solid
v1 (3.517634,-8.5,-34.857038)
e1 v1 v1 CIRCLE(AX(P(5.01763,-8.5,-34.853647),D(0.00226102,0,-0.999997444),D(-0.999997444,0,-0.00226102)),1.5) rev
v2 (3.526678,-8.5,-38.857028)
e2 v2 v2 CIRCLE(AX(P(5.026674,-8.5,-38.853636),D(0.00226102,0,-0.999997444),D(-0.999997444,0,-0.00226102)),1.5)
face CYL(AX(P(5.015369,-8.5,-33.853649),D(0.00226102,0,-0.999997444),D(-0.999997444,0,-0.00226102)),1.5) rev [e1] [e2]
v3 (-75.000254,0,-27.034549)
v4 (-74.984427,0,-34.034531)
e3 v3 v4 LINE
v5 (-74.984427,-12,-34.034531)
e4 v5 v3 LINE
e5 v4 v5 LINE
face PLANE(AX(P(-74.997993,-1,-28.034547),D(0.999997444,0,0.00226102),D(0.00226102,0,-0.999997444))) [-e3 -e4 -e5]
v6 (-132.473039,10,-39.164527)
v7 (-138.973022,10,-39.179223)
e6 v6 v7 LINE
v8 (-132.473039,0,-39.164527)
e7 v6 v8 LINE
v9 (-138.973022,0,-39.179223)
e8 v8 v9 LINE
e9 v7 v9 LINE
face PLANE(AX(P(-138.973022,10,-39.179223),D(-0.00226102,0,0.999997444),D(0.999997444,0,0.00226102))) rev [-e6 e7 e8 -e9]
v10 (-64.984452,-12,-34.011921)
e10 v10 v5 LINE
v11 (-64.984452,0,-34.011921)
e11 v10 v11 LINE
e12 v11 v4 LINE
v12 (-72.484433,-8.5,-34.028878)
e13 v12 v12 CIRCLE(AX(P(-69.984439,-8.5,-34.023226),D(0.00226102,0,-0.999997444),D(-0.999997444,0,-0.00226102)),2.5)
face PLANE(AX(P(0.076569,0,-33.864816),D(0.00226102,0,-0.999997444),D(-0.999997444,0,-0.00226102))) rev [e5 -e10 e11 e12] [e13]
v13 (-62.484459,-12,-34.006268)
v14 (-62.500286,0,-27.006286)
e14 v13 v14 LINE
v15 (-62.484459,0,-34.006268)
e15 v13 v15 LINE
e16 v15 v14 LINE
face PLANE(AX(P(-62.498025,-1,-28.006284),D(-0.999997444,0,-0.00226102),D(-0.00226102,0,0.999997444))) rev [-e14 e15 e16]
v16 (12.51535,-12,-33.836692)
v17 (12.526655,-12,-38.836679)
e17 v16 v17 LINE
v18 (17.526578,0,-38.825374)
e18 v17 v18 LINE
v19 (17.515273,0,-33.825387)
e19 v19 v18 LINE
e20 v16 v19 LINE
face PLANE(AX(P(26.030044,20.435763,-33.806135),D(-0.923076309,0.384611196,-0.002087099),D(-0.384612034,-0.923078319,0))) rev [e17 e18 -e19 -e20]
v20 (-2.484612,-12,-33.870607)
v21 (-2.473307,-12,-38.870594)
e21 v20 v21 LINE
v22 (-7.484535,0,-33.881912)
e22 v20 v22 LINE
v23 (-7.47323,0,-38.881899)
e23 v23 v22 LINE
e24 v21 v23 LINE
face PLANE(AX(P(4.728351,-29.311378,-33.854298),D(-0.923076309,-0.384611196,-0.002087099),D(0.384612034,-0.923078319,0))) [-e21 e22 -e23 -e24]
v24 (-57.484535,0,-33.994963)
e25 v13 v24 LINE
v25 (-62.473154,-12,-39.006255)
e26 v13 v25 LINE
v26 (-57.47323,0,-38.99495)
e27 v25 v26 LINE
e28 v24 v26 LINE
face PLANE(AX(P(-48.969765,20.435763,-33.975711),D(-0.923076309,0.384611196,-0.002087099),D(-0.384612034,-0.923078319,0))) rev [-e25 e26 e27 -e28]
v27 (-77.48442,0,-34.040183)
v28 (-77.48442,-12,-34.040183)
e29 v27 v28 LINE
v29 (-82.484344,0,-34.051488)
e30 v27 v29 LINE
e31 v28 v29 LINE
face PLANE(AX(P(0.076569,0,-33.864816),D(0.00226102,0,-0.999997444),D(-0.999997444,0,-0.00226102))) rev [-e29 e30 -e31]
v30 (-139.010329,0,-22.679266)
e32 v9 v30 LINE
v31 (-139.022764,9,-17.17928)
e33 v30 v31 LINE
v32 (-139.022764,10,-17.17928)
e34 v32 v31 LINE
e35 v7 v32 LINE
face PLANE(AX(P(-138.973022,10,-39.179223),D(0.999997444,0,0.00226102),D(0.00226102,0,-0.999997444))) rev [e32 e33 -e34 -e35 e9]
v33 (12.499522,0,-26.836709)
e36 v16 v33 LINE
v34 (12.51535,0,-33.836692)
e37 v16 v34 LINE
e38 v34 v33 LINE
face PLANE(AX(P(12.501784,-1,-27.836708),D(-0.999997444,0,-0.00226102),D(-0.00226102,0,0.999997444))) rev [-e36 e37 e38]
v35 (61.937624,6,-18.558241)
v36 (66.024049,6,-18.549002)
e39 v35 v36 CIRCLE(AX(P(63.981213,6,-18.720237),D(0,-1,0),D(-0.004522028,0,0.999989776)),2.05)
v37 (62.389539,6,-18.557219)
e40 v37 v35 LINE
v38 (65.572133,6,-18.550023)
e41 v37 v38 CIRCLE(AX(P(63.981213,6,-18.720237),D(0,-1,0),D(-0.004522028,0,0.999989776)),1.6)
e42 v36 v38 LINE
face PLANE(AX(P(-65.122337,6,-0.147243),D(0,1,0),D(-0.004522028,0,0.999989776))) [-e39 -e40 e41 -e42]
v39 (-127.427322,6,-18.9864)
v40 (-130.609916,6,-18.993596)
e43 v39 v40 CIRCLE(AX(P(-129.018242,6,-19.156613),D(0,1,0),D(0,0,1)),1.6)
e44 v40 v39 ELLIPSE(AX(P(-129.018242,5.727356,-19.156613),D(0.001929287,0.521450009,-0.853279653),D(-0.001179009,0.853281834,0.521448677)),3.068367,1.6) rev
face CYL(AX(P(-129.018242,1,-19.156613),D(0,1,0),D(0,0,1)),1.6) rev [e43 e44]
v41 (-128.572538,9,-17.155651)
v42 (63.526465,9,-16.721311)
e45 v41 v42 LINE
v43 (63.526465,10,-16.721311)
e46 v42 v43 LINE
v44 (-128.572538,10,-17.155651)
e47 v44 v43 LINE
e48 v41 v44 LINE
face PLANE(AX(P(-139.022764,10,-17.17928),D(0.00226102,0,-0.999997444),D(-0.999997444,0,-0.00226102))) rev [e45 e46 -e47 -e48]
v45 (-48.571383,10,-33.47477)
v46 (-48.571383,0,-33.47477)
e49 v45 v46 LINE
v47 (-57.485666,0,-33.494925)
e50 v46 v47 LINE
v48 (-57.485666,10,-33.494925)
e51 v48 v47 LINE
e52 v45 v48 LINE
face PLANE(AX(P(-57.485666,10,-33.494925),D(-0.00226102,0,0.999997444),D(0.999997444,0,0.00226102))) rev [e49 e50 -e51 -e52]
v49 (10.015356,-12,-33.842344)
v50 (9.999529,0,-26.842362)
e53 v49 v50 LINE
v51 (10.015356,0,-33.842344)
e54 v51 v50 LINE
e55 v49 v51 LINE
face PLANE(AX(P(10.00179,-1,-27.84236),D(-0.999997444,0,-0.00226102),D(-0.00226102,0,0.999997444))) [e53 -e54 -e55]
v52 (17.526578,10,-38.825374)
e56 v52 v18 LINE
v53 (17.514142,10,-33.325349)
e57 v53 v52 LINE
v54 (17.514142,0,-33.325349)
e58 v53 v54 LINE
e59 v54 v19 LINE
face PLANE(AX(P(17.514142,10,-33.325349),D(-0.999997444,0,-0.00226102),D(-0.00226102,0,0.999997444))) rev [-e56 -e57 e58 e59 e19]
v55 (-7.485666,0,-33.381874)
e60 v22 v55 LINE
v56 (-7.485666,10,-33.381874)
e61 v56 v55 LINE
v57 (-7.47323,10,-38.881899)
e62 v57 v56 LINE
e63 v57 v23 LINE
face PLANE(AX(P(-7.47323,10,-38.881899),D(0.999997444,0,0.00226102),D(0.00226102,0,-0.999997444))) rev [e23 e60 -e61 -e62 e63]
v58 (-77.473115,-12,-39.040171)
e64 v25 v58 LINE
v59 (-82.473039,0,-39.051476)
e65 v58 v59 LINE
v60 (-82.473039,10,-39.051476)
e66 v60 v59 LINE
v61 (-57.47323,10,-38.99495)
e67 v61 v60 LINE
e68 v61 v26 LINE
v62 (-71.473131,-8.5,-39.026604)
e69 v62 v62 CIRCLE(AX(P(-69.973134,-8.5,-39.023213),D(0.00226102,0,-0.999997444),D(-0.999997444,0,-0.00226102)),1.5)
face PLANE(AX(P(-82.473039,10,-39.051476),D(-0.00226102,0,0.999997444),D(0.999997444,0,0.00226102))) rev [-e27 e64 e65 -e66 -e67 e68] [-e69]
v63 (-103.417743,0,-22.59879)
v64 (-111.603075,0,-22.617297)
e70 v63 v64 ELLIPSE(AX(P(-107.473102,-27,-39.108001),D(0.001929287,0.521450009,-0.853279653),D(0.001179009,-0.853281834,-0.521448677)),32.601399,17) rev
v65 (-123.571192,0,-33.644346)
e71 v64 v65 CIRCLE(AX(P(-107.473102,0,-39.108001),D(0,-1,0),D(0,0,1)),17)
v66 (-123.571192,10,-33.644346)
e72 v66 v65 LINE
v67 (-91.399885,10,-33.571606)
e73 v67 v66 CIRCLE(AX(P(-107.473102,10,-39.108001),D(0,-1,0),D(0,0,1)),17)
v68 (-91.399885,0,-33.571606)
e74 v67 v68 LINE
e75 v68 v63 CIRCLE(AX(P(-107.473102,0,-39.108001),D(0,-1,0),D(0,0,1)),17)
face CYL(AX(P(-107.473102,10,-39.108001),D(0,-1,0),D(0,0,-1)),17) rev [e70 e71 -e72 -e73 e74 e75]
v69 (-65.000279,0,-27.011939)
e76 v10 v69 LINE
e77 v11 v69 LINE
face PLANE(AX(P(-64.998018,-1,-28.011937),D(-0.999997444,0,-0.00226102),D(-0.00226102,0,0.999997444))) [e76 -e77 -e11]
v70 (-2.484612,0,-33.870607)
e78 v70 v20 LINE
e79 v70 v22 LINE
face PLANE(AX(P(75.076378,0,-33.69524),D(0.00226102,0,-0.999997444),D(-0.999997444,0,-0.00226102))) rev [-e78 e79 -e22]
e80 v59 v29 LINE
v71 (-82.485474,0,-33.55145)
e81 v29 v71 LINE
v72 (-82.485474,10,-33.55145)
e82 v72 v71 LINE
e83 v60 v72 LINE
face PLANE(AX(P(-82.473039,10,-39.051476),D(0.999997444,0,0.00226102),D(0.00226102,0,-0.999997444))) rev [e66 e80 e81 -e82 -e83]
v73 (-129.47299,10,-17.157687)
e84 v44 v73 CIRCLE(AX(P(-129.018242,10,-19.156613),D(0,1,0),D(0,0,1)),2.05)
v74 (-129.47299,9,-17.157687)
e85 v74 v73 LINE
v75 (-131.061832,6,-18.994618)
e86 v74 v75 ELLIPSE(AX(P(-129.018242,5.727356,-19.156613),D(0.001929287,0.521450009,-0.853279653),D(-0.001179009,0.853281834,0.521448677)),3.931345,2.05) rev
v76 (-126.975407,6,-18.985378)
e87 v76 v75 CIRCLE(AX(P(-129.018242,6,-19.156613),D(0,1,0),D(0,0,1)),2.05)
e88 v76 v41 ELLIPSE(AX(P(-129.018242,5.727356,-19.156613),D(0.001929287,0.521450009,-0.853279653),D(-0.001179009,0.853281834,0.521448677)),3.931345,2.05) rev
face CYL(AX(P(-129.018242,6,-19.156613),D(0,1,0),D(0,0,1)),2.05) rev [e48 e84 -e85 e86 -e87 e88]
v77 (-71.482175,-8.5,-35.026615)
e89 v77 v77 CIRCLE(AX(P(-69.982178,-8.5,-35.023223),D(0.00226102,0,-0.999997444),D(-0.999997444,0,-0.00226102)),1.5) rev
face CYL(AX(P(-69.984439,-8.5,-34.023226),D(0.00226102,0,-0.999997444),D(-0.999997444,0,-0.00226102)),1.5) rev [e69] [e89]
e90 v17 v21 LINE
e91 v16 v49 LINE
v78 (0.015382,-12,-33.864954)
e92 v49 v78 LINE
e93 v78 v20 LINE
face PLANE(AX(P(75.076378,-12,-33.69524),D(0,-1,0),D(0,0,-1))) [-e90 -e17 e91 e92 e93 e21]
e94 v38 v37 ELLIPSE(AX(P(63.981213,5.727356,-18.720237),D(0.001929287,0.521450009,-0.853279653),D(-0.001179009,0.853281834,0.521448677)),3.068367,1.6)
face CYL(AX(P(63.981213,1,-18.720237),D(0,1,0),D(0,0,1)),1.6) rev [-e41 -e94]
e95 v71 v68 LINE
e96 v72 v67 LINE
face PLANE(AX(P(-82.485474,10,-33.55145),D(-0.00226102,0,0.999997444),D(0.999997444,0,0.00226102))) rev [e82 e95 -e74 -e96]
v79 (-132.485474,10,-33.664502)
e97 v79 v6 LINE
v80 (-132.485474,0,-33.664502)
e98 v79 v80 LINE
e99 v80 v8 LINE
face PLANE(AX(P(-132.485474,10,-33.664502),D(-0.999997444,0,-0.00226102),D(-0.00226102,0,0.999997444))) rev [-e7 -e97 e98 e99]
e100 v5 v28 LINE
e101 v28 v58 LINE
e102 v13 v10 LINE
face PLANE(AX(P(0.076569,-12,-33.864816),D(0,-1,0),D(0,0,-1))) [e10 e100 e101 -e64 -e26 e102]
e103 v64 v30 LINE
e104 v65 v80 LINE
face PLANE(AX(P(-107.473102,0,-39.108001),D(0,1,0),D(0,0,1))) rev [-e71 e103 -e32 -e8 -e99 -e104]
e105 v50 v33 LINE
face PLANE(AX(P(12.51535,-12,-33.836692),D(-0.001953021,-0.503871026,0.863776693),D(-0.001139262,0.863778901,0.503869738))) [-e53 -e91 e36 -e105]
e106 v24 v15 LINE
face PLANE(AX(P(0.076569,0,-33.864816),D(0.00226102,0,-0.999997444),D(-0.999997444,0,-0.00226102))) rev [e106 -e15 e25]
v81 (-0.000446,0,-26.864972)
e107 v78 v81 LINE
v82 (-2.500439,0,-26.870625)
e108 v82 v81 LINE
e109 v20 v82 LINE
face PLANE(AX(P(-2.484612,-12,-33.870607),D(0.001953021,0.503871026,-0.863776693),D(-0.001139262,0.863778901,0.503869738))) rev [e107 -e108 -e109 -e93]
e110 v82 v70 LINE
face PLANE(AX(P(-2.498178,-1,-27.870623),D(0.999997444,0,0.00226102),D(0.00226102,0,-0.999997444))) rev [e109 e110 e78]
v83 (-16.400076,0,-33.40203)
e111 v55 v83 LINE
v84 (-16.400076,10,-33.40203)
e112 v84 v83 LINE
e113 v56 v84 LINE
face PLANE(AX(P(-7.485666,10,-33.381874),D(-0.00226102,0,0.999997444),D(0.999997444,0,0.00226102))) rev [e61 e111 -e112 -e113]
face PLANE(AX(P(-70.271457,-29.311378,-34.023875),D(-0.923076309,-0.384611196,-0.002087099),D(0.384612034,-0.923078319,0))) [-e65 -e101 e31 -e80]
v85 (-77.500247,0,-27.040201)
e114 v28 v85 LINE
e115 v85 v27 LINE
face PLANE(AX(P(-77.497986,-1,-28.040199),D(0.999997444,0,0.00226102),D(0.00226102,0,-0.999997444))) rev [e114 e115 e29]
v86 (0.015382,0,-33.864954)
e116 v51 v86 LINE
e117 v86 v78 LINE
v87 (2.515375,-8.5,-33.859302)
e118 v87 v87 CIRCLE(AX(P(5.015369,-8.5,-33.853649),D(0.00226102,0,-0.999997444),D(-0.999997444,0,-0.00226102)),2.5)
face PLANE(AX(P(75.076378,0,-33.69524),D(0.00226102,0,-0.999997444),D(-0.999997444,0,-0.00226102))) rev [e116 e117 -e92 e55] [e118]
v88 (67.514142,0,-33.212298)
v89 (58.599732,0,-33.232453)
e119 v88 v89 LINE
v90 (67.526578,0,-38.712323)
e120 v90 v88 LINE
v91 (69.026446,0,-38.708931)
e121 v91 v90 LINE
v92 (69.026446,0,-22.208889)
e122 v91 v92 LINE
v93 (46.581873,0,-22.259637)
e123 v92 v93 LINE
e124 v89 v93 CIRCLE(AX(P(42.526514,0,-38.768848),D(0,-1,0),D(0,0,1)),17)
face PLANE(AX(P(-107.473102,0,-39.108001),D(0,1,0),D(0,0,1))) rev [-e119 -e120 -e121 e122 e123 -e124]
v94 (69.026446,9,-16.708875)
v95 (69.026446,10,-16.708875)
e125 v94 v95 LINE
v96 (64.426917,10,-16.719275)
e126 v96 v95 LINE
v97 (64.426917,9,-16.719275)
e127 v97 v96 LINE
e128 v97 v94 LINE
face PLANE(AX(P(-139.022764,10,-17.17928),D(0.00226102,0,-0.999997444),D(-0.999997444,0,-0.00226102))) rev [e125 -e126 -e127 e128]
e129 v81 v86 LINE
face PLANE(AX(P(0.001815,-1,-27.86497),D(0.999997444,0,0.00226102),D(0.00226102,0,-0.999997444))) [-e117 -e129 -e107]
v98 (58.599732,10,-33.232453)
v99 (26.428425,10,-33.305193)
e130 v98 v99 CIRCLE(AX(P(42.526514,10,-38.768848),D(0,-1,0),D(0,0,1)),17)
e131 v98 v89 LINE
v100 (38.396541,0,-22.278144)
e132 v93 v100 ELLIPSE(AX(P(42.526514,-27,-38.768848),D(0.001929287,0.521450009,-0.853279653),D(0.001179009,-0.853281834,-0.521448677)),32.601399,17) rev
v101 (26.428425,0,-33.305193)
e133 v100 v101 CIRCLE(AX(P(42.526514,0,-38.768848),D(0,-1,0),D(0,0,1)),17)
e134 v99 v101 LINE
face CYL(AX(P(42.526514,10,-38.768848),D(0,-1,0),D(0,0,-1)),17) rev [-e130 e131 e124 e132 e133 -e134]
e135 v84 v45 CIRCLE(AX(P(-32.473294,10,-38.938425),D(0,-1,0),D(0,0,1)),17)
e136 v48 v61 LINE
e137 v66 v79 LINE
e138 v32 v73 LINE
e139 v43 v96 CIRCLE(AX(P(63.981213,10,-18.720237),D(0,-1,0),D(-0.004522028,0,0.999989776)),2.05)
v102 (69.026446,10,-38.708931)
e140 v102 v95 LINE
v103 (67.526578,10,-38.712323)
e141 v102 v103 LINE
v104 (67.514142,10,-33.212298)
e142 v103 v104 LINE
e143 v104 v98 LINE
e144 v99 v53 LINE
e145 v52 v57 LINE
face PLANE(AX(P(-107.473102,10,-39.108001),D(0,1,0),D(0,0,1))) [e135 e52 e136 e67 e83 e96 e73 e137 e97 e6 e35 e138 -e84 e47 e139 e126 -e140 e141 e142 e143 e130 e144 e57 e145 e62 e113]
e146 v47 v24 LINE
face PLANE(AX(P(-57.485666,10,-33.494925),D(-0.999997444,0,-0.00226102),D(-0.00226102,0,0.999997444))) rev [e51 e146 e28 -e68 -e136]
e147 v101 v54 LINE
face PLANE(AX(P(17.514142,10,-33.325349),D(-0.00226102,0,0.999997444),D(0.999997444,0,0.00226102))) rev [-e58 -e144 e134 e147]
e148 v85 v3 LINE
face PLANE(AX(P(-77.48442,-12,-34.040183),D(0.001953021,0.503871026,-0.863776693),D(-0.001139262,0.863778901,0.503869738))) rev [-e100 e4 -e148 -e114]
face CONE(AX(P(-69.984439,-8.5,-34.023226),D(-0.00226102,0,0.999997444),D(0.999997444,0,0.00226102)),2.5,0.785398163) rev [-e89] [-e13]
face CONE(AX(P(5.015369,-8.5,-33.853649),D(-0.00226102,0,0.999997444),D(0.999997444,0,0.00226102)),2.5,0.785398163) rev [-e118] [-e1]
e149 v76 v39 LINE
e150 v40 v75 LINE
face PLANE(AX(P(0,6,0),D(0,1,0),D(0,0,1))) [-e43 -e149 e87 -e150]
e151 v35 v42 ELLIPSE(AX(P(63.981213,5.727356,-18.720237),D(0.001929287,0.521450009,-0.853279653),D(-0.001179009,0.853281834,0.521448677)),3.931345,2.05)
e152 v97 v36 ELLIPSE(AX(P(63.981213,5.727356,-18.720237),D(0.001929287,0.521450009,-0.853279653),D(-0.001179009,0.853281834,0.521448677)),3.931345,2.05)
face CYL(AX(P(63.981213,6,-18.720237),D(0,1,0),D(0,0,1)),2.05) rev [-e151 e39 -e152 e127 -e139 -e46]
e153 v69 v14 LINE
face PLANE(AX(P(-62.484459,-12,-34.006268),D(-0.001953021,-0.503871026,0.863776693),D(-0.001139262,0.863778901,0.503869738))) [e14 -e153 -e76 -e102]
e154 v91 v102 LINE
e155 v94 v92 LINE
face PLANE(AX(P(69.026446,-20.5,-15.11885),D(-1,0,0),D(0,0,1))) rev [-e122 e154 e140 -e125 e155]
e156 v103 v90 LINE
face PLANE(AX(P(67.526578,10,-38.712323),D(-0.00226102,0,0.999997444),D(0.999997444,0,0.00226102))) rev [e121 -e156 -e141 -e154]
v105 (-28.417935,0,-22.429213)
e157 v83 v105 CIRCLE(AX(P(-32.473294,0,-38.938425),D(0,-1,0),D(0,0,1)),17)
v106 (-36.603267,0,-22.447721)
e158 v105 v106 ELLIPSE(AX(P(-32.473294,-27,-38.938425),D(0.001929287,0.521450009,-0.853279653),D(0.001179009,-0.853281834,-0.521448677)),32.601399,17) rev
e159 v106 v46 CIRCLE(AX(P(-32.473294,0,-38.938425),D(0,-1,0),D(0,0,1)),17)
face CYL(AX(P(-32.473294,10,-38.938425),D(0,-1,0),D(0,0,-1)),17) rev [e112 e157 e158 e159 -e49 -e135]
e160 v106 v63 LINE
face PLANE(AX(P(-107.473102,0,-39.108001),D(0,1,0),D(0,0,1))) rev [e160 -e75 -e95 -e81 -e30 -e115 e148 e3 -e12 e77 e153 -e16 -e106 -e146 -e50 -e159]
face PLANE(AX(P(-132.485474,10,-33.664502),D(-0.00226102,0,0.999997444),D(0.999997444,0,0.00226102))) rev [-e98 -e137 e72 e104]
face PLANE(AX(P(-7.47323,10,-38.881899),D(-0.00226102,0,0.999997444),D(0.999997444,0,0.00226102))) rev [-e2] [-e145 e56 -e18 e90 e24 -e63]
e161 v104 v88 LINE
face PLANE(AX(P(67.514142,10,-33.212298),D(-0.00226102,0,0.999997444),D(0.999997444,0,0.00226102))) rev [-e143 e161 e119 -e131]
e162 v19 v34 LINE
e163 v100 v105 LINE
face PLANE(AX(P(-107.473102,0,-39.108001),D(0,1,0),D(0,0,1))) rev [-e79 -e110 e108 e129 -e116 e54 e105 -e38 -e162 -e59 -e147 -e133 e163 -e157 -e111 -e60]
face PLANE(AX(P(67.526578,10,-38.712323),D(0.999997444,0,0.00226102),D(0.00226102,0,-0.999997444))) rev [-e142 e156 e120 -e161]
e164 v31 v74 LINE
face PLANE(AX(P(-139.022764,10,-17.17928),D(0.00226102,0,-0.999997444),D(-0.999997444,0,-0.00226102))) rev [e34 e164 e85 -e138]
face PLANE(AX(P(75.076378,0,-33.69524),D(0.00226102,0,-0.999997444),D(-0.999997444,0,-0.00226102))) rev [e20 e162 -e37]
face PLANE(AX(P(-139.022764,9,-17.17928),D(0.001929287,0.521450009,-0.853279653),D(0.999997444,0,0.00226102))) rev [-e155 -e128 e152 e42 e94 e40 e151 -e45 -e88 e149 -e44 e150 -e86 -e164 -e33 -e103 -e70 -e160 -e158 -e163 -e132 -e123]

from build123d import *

# Parameters (mm, degrees)
BOSS_EXTRUDE3_DEPTH        = 10
SKETCH4_R                  = 1.5
BOSS_EXTRUDE4_DEPTH        = 5
RIB6_REACH                 = 158.985
SKETCH5_WALL_W             = 329.861950248
SKETCH5_WALL_H             = 2.5
CHAMFER2_SIZE              = 1
CHAMFER3_SIZE              = 5.5
CHAMFER3_SIZE_2            = 9
LPATTERN4_COUNT            = 2
LPATTERN4_PITCH            = 75
LPATTERN4_COPY_1_REACH     = 158.985
LPATTERN4_COPY_1_SKETCH_W  = 329.861950248
LPATTERN4_COPY_1_SKETCH_H  = 2.5
CHAMFER2_OF_LPATTERN4_SIZE = 1
SKETCH8_R                  = 2.05
CUT_EXTRUDE1_DEPTH         = 4
SKETCH9_R                  = 1.6
CUT_EXTRUDE2_DEPTH         = 5
SZKIC1_W                   = 8.551960468
SZKIC1_H                   = 23.590081372
WYTNIJ_WYCI_GNI_CIE3_DEPTH = 30.5


with BuildPart() as part:
    # Sketch2 → Boss-Extrude3 (new body)
    with BuildSketch(Plane(origin=(0, 0, 0), x_dir=(1, 0, 0), z_dir=(0, 1, 0))):
        with BuildLine():
            Line((-138.973021921, 39.179223473), (-139.022764358, 17.179279707))
            Line((-139.022764358, 17.179279707), (73.976691191, 16.697682479))
            Line((73.976691191, 16.697682479), (74.026978079, 38.697625014))
            Line((74.026978079, 38.697625014), (67.526578048, 38.712322585))
            Line((67.526578048, 38.712322585), (67.51414235, 33.212297518))
            Line((67.51414235, 33.212297518), (58.599731895, 33.232453229))
            ThreePointArc((58.599731895, 33.232453229), (42.488076808, 21.768891824), (26.428425, 33.305193378))
            Line((26.428425, 33.305193378), (17.51414235, 33.3253488))
            Line((17.51414235, 33.3253488), (17.526578048, 38.825373866))
            Line((17.526578048, 38.825373866), (-7.473230244, 38.881899074))
            Line((-7.473230244, 38.881899074), (-7.485665941, 33.381874007))
            Line((-7.485665941, 33.381874007), (-16.400076396, 33.402029717))
            ThreePointArc((-16.400076396, 33.402029717), (-32.511731484, 21.938468313), (-48.571383292, 33.474769867))
            Line((-48.571383292, 33.474769867), (-57.485665941, 33.494925288))
            Line((-57.485665941, 33.494925288), (-57.473230244, 38.994950355))
            Line((-57.473230244, 38.994950355), (-82.473038536, 39.051475562))
            Line((-82.473038536, 39.051475562), (-82.485474233, 33.551450496))
            Line((-82.485474233, 33.551450496), (-91.399884688, 33.571606206))
            ThreePointArc((-91.399884688, 33.571606206), (-107.511539776, 22.108044802), (-123.571191584, 33.644346356))
            Line((-123.571191584, 33.644346356), (-132.485474233, 33.664501777))
            Line((-132.485474233, 33.664501777), (-132.473038536, 39.164526844))
            Line((-132.473038536, 39.164526844), (-138.973021921, 39.179223473))
        make_face()
    extrude(amount=BOSS_EXTRUDE3_DEPTH)

    # Sketch4 → Boss-Extrude4 (add)
    with BuildSketch(Plane(origin=(0.087874316, 0, -38.864803222), x_dir=(-0.99999744389135, 0, -0.002261019850970016), z_dir=(0.002261019850970016, 0, -0.99999744389135))):
        Polygon((62.56118779, -12), (57.561251693, 0), (82.561123887, 0), (77.56118779, -12), align=None)
        with Locations((70.06118779, -8.5)):
            Circle(SKETCH4_R, mode=Mode.SUBTRACT)
    boss_extrude4 = extrude(amount=-BOSS_EXTRUDE4_DEPTH)

    # Sketch5 wall → Rib6 (add, up to next)
    with BuildSketch(Plane(origin=(-77.492333887, -6, -30.540192335), x_dir=(-0.001139262394, 0.863778900906, 0.503869737562), z_dir=(-0.001953021242, -0.503871025511, 0.863776692993)), mode=Mode.PRIVATE) as rib6_sk1:
        with Locations((0, -1.25)):
            Rectangle(SKETCH5_WALL_W, SKETCH5_WALL_H)
    rib6_tool1 = extrude(rib6_sk1.sketch, amount=-RIB6_REACH, mode=Mode.PRIVATE) - part.part
    rib6 = rib6_tool1.solids().sort_by_distance((-77.492333887, -6, -30.540192335))[0]
    add(rib6)

    # Mirror2: Rib6 across plane
    add(rib6.mirror(Plane(origin=(-70.061008706, 0, -0.158409736), x_dir=(-0.0022610198509701073, 0, 0.99999744389135), z_dir=(0.99999744389135, 0, 0.002261019850970107))))

    # Chamfer2
    chamfer2_edges = [part.edges().sort_by_distance(p)[0] for p in [
        (-68.484443323, -8.5, -34.01983421),
    ]]
    chamfer(chamfer2_edges, length=CHAMFER2_SIZE)

    # Chamfer3
    # the kernel refuses this chamfer: 9, 5.5 mm, written as the material it takes off along each edge
    with BuildSketch(Plane(origin=(-162.295390883, 0, -17.231899712), x_dir=(0.0022577295255832275, -0.053929224624231706, -0.9985422081158205), z_dir=(0.9999974438913499, 0, 0.0022610198509699707))) as chamfer3_piece_1:
        Polygon((CHAMFER3_SIZE * 0.998544760505, CHAMFER3_SIZE * 0.0539292246242), (-CHAMFER3_SIZE_2 * 0.0539292246242, CHAMFER3_SIZE_2 * 0.998544760505), (0, 0), align=None)
    extrude(amount=259.545372026, mode=Mode.SUBTRACT)

    # LPattern4: Boss-Extrude4, Rib6 ×2
    with Locations(*[Vector(0.9999974438913499, 0, 0.0022610198509701) * (i * LPATTERN4_PITCH) for i in range(1, LPATTERN4_COUNT)]):
        add(boss_extrude4)
        add(rib6)

    # LPattern4 copy 1 sketch → LPattern4 copy 1 (add, up to next)
    with BuildSketch(Plane(origin=(12.507436062, -6, -30.336700548), x_dir=(-0.0011392623880184954, 0.863778900906, 0.5038697375620136), z_dir=(-0.0019530212415939509, -0.503871025511, 0.863776692993001)), mode=Mode.PRIVATE) as lpattern4_copy_1_sk1:
        with Locations((0, 1.25)):
            Rectangle(LPATTERN4_COPY_1_SKETCH_W, LPATTERN4_COPY_1_SKETCH_H)
    lpattern4_copy_1_tool1 = extrude(lpattern4_copy_1_sk1.sketch, amount=-LPATTERN4_COPY_1_REACH, mode=Mode.PRIVATE) - part.part
    add(lpattern4_copy_1_tool1.solids().sort_by_distance((12.507436062, -6, -30.336700548))[0])

    # Chamfer2 of LPattern4
    chamfer2_of_lpattern4_edges = [part.edges().sort_by_distance(p)[0] for p in [
        (6.515364969, -8.5, -33.850257721),
    ]]
    chamfer(chamfer2_of_lpattern4_edges, length=CHAMFER2_OF_LPATTERN4_SIZE)

    # Sketch8 → Cut-Extrude1 (cut)
    with BuildSketch(Plane(origin=(0, 10, 0), x_dir=(1, 0, 0), z_dir=(0, 1, 0))):
        with Locations((-129.018242433, 19.156613217)):
            Circle(SKETCH8_R)
    cut_extrude1 = extrude(amount=-CUT_EXTRUDE1_DEPTH, mode=Mode.SUBTRACT)

    # Sketch9 → Cut-Extrude2 (cut)
    with BuildSketch(Plane(origin=(0, 6, 0), x_dir=(1, 0, 0), z_dir=(0, 1, 0))):
        with Locations((-129.018242433, 19.156613217)):
            Circle(SKETCH9_R)
    cut_extrude2 = extrude(amount=-CUT_EXTRUDE2_DEPTH, mode=Mode.SUBTRACT)

    # Mirror4: Cut-Extrude1, Cut-Extrude2 across plane
    add(cut_extrude1.mirror(Plane(origin=(-32.561168463, 0, -0.073621636), x_dir=(-0.002261019850969509, 0, 0.99999744389135), z_dir=(-0.99999744389135, 0, -0.0022610198509695084))), mode=Mode.SUBTRACT)
    add(cut_extrude2.mirror(Plane(origin=(-32.561168463, 0, -0.073621636), x_dir=(-0.002261019850969509, 0, 0.99999744389135), z_dir=(-0.99999744389135, 0, -0.0022610198509695084))), mode=Mode.SUBTRACT)

    # Szkic1 → Wytnij-wyciągnięcie3 (cut)
    with BuildSketch(Plane(origin=(0, 10, 0), x_dir=(1, 0, 0), z_dir=(0, 1, 0))):
        with Locations((73.302426643, 26.913890658)):
            Rectangle(SZKIC1_W, SZKIC1_H)
    extrude(amount=-WYTNIJ_WYCI_GNI_CIE3_DEPTH, mode=Mode.SUBTRACT)


solid = part.part
